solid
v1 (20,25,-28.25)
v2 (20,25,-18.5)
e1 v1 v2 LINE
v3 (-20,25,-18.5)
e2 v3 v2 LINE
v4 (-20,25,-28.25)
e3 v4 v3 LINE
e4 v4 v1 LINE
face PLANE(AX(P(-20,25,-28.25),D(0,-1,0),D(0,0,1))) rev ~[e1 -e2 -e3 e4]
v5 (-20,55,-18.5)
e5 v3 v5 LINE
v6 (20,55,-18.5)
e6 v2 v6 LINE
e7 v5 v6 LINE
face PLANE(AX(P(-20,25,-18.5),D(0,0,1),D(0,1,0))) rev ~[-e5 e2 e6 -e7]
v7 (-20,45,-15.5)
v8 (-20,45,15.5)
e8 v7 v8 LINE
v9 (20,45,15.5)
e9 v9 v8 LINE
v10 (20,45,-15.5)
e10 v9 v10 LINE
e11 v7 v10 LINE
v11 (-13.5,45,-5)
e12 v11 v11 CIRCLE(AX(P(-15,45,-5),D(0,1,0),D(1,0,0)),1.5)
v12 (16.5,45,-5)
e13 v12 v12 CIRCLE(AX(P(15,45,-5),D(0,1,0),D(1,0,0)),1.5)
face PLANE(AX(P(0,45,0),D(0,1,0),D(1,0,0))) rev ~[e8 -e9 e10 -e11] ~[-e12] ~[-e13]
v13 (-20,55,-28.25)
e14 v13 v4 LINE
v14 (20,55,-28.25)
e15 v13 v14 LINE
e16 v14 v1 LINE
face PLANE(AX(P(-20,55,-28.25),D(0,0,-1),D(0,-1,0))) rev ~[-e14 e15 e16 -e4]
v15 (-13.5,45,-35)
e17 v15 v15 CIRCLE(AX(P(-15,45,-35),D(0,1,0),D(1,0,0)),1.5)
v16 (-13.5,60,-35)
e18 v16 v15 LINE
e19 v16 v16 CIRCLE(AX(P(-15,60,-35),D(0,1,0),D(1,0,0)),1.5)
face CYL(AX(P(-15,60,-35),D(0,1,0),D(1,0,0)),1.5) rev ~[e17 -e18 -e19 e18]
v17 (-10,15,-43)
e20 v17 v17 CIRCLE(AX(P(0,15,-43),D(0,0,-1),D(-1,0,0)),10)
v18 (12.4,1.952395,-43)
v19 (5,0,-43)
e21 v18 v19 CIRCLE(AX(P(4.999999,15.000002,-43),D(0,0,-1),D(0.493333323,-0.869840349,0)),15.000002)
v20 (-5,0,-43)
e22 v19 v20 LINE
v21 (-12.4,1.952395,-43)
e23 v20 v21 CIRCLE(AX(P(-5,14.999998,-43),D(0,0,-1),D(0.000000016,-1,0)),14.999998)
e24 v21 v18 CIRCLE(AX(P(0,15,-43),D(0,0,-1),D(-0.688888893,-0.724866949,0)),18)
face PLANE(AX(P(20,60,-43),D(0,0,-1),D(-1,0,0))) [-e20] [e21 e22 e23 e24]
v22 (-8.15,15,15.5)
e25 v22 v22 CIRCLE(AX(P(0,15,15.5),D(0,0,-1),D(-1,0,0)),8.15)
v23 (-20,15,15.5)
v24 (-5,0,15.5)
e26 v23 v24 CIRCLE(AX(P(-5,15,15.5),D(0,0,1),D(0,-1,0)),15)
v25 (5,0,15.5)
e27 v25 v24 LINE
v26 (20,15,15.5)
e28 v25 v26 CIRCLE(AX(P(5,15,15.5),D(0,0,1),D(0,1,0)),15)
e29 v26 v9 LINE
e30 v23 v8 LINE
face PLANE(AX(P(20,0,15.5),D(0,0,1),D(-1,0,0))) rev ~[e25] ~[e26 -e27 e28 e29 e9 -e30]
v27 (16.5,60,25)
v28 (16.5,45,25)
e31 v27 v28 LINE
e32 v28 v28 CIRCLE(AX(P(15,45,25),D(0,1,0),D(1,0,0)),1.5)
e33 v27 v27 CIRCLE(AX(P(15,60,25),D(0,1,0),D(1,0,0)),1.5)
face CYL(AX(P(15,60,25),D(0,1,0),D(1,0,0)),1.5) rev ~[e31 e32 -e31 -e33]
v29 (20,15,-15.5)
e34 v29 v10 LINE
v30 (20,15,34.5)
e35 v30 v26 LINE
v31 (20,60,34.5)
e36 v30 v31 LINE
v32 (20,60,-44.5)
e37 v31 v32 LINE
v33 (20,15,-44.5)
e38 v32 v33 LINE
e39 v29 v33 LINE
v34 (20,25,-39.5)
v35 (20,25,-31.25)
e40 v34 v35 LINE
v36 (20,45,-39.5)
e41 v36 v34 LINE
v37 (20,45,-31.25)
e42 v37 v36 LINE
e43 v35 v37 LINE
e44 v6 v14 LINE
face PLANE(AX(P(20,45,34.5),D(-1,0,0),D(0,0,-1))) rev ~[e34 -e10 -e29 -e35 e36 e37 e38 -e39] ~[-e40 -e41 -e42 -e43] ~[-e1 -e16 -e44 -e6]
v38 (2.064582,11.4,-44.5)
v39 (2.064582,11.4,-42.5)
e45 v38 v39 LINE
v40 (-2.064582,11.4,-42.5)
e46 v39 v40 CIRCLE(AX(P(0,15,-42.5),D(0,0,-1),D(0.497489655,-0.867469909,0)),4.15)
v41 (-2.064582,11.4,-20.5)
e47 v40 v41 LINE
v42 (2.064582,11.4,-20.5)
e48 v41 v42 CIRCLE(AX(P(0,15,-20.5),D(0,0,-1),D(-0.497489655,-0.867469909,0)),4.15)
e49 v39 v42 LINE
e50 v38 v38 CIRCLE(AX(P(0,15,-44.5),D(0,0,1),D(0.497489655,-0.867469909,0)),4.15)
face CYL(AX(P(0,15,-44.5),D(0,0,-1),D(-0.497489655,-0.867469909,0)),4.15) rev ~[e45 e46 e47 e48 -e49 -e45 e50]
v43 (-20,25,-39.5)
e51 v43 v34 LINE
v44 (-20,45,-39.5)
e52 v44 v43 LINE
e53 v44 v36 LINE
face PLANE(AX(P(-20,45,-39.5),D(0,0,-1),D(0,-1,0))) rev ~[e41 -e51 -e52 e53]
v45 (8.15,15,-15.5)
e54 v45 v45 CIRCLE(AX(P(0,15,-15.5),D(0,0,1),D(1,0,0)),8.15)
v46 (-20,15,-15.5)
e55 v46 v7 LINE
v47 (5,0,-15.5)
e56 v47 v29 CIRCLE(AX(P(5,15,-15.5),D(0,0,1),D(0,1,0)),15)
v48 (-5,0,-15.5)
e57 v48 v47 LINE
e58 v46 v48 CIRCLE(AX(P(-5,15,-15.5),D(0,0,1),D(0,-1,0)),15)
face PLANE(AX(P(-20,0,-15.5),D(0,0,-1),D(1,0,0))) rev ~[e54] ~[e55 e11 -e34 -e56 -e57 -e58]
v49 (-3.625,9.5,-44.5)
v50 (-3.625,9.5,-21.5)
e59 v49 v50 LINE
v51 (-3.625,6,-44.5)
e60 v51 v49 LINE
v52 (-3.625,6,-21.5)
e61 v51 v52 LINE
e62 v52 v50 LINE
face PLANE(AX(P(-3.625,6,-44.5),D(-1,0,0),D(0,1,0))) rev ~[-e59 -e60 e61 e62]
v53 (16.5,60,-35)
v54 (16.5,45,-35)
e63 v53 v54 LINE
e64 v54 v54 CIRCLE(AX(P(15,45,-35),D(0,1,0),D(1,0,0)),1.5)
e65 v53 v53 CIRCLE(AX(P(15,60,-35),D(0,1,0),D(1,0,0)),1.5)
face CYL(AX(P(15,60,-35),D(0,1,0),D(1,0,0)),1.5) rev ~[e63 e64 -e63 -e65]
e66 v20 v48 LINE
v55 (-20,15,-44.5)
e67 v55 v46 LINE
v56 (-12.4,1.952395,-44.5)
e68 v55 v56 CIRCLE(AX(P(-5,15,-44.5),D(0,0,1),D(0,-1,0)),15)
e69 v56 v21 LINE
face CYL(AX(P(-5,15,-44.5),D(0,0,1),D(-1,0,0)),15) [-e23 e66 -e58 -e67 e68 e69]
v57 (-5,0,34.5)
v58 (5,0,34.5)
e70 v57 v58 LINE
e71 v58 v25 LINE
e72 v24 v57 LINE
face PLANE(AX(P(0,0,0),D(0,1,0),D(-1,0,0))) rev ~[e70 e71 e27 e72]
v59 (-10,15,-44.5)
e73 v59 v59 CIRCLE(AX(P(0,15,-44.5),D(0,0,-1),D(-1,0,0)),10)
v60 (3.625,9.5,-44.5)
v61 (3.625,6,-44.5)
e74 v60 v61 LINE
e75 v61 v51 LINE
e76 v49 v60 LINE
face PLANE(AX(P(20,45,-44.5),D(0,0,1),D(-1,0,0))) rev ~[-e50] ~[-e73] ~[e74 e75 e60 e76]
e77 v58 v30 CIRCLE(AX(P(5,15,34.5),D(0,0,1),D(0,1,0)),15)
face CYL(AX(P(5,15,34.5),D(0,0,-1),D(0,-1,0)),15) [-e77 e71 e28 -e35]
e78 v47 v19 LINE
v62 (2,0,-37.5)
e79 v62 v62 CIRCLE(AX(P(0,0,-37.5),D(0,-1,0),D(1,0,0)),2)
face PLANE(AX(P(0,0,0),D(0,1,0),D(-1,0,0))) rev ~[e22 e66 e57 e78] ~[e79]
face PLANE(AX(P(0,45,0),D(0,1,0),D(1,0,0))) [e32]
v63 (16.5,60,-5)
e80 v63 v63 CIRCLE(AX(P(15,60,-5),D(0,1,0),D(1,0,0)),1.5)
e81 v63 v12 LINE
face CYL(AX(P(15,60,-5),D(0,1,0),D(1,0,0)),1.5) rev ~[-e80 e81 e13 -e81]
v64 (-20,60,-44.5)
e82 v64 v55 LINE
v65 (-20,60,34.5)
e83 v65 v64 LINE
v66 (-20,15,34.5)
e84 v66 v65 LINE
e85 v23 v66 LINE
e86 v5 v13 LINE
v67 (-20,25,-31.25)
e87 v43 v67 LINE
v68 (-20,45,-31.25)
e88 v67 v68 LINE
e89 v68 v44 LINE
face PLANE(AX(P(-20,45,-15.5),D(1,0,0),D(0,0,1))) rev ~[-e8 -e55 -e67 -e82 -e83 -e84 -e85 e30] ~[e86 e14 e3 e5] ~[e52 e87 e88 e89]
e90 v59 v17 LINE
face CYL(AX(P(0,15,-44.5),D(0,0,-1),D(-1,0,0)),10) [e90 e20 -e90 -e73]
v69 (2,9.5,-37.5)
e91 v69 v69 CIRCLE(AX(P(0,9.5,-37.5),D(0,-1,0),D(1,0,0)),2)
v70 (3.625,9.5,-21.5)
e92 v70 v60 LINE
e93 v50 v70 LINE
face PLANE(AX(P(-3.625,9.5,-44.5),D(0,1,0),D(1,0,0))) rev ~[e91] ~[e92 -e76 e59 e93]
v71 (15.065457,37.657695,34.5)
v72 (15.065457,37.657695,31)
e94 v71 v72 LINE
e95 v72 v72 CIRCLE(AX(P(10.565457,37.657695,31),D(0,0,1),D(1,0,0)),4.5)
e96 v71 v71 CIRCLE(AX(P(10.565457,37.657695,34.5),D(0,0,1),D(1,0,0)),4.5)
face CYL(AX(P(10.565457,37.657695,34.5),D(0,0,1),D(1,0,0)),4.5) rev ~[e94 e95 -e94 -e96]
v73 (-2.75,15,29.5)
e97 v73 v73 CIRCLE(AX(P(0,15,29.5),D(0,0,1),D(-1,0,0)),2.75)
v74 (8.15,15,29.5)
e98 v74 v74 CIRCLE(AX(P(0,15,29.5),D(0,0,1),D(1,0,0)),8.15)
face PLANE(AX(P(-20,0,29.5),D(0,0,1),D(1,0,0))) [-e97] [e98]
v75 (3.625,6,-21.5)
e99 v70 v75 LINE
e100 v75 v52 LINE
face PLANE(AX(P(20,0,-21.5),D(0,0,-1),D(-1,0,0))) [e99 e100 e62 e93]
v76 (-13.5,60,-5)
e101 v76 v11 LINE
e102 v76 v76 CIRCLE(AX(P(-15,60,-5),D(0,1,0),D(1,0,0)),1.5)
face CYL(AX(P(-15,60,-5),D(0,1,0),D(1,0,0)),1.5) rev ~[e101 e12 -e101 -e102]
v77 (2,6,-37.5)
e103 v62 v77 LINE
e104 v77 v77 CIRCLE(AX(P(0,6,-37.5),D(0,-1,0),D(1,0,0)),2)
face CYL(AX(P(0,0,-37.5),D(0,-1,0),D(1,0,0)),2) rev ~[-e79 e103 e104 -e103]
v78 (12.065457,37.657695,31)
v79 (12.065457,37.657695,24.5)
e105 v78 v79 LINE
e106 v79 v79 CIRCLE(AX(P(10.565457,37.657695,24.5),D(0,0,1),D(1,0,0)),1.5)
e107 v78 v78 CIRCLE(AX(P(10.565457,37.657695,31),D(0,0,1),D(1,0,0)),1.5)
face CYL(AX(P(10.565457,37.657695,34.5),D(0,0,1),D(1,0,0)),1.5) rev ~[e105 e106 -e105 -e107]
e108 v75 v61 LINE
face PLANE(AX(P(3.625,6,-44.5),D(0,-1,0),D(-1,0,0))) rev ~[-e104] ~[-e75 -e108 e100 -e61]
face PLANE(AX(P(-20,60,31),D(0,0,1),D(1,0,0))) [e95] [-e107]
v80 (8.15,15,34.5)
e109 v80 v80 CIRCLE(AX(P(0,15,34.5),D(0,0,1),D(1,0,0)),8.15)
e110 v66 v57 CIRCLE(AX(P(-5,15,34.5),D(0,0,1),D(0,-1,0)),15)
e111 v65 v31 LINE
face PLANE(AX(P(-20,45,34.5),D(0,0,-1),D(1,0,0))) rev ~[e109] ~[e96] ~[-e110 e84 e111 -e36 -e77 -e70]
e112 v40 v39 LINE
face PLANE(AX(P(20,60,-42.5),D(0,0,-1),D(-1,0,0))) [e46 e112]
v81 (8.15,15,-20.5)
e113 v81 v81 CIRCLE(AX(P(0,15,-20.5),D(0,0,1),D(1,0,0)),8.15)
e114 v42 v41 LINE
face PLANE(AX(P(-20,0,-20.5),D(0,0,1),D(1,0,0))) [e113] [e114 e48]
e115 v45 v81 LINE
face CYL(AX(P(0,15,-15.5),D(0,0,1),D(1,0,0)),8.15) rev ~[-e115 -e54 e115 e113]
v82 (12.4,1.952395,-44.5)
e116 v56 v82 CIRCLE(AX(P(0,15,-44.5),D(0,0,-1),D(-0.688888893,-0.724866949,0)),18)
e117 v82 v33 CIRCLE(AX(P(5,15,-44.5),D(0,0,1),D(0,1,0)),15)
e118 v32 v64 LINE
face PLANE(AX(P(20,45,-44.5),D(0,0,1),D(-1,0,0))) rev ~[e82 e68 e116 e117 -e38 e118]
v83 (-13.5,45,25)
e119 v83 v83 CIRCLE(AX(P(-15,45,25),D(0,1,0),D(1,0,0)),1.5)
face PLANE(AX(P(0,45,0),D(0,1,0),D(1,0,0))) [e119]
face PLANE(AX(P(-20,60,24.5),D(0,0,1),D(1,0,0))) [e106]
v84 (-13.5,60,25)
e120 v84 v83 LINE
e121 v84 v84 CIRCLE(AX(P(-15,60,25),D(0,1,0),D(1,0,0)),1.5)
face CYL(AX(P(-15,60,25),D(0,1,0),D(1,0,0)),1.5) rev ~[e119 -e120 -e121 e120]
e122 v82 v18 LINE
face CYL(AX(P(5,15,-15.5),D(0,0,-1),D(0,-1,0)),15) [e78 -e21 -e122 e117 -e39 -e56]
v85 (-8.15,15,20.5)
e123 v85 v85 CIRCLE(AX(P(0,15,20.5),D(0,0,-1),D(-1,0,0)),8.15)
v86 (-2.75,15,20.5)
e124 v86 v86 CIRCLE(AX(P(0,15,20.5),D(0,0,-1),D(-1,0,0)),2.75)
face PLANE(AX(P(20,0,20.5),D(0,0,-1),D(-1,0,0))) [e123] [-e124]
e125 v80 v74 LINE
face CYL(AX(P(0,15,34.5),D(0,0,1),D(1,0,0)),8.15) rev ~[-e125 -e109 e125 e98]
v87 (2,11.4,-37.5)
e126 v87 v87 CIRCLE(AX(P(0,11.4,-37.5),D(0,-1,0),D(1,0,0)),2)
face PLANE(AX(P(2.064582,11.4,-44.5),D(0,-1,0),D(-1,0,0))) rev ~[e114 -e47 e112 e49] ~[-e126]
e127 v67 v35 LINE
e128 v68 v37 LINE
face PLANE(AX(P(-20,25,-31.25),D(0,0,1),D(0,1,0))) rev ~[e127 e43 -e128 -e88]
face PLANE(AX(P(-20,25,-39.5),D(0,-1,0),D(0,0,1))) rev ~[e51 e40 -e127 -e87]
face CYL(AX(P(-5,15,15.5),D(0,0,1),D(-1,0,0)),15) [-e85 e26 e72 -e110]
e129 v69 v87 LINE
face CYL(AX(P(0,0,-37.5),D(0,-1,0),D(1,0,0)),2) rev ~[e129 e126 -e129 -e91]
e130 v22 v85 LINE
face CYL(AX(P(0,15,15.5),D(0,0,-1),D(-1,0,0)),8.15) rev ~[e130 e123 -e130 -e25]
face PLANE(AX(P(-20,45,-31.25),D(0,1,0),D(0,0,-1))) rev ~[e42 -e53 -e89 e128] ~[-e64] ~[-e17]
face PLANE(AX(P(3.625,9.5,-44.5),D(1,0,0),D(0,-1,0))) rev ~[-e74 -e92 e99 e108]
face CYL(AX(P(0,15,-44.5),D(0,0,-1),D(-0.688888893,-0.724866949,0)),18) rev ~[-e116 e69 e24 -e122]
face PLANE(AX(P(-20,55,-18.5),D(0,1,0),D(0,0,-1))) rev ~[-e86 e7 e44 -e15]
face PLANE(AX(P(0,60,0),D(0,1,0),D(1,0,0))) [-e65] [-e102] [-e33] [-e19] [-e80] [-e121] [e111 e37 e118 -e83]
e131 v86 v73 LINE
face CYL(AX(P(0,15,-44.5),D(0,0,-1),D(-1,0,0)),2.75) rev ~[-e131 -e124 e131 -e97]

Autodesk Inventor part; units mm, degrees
ref_plane "YZ Plane" through (0, 0, 0) normal (1, 0, 0) x (0, 1, 0)
ref_plane "XZ Plane" through (0, 0, 0) normal (0, 1, 0) x (-1, 0, 0)
ref_plane "XY Plane" through (0, 0, 0) normal (0, 0, 1) x (1, 0, 0)
sketch "Sketch1" plane through (0, 0, 0) normal (0, 1, 0) x (-1, 0, 0)
  line L0 (20, 34.5) -> (-20, 34.5)
  line L1 (-20, 34.5) -> (-20, 15.5)
  line L2 (-20, 15.5) -> (20, 15.5)
  line L3 (20, 15.5) -> (20, 34.5)
  line L4 (20, -15.5) -> (-20, -15.5)
  line L5 (-20, -15.5) -> (-20, -44.5)
  line L6 (-20, -44.5) -> (20, -44.5)
  line L7 (20, -44.5) -> (20, -15.5)
  point P0 (0, 0)
  dimension "d0" = 31
  dimension "d1" = 19
  dimension "d2" = 40
  dimension "d3" = 20
  dimension "d4" = 29
  dimension "d50" = 15.5
sketch "Sketch1 outline for Extrusion1" plane through (0, 0, 0) normal (0, 1, 0) x (-1, 0, 0)
  line L0 (20, -15.5) -> (-20, -15.5)
  line L1 (20, -44.5) -> (20, -15.5)
  line L2 (-20, -44.5) -> (20, -44.5)
  line L3 (-20, -15.5) -> (-20, -44.5)
  line L4 (20, 34.5) -> (-20, 34.5)
  line L5 (20, 15.5) -> (20, 34.5)
  line L6 (-20, 15.5) -> (20, 15.5)
  line L7 (-20, 34.5) -> (-20, 15.5)
extrude "Extrusion1" add sketch "Sketch1 outline for Extrusion1" along normal blind 45
sketch "Sketch2" plane through (20, 0, -44.5) normal (0, 0, -1) x (-1, 0, 0)
  circle A0 centre (20, 15) radius 8.125
  line L0 (0, 0) -> (40, 0) projected
  circle A1 centre (20, 15) radius 2.75
  point P0 (20, 0)
  point P1 (20, 0)
  dimension "d7" = 16.25
  dimension "d8" = 15
  dimension "d9" = 5.5
sketch "Sketch2 outline for Extrusion2" plane through (20, 0, -44.5) normal (0, 0, -1) x (-1, 0, 0)
  circle A0 centre (20, 15) radius 2.75
extrude "Extrusion2" cut sketch "Sketch2 outline for Extrusion2" against normal blind 274.75
sketch "Sketch3" plane through (0, 45, 0) normal (0, 1, 0) x (1, 0, 0)
  line L0 (20, -34.5) -> (20, -15.5) projected
  line L1 (-20, 44.5) -> (-20, 15.5) projected
  line L2 (20, -34.5) -> (-20, -34.5)
  line L3 (-20, -34.5) -> (-20, 44.5)
  line L4 (-20, 44.5) -> (20, 44.5)
  line L5 (20, 44.5) -> (20, -34.5)
  point P0 (0, 0)
sketch "Sketch3 outline for Extrusion3" plane through (0, 45, 0) normal (0, 1, 0) x (1, 0, 0)
  line L0 (-20, -34.5) -> (20, -34.5)
  line L1 (-20, 15.5) -> (-20, -34.5)
  line L2 (-20, 44.5) -> (-20, 15.5)
  line L3 (20, 44.5) -> (-20, 44.5)
  line L4 (20, -15.5) -> (20, 44.5)
  line L5 (20, -34.5) -> (20, -15.5)
extrude "Extrusion3" add sketch "Sketch3 outline for Extrusion3" along normal blind 15
sketch "Sketch4" plane through (-20, 0, -44.5) normal (-1, 0, 0) x (0, 0, 1)
  line L0 (5, 55) -> (26, 55)
  line L1 (26, 55) -> (26, 25)
  line L2 (26, 25) -> (5, 25)
  line L3 (5, 25) -> (5, 55)
  line L4 (0, 0) -> (0, 60) projected
  line L5 (29, 0) -> (29, 45) projected
  line L6 (0, 60) -> (79, 60) projected
  line L7 (0, 0) -> (29, 0) projected
  line L8 (13.25, 55) -> (16.25, 55)
  line L9 (16.25, 55) -> (16.25, 25)
  line L10 (16.25, 25) -> (13.25, 25)
  line L11 (13.25, 25) -> (13.25, 55)
  line L12 (5, 55) -> (13.25, 55)
  line L13 (13.25, 45) -> (5, 45)
  point P0 (44.5, 0)
  dimension "d14" = 5
  dimension "d15" = 3
  dimension "d16" = 5
  dimension "d18" = 3
  dimension "d19" = 9.75
  dimension "d45" = 25
sketch "Sketch4 outline for Extrusion4" plane through (-20, 0, -44.5) normal (-1, 0, 0) x (0, 0, 1)
  line L0 (26, 25) -> (26, 55)
  line L1 (16.25, 25) -> (26, 25)
  line L2 (16.25, 55) -> (16.25, 25)
  line L3 (26, 55) -> (16.25, 55)
  line L4 (13.25, 45) -> (5, 45)
  line L5 (13.25, 25) -> (13.25, 45)
  line L6 (5, 25) -> (13.25, 25)
  line L7 (5, 45) -> (5, 25)
extrude "Extrusion4" cut sketch "Sketch4 outline for Extrusion4" against normal blind 100
sketch "Sketch5" plane through (20, 0, -44.5) normal (0, 0, -1) x (-1, 0, 0)
  circle A0 centre (20, 15) radius 2.75
  circle A1 centre (20, 15) radius 4.15
  line L0 (17.935418, 11.4) -> (22.064582, 11.4)
  point P0 (20, 0)
  dimension "d22" = 8.3
  dimension "d24" = 3.6
sketch "Sketch5 outline for Extrusion5" plane through (20, 0, -44.5) normal (0, 0, -1) x (-1, 0, 0)
  line L0 (17.935418, 11.4) -> (22.064582, 11.4)
  arc A0 (22.064582, 11.4) -> (17.935418, 11.4) centre (20, 15) ccw
  circle A1 centre (20, 15) radius 2.75
extrude "Extrusion5" cut sketch "Sketch5 outline for Extrusion5" against normal blind 25
sketch "Sketch6" plane through (20, 0, -44.5) normal (0, 0, -1) x (-1, 0, 0)
  line L0 (16.375, 9.5) -> (23.625, 9.5)
  line L1 (23.625, 9.5) -> (23.625, 6)
  line L2 (23.625, 6) -> (16.375, 6)
  line L3 (16.375, 6) -> (16.375, 9.5)
  line L4 (0, 0) -> (40, 0) projected
  circle A0 centre (20, 15) radius 2.75 projected
  point P0 (20, 0)
  point P1 (20, 0)
  dimension "d27" = 3.5
  dimension "d28" = 7.25
  dimension "d29" = 3.625
  dimension "d30" = 5.5
sketch "Sketch6 outline for Extrusion6" plane through (20, 0, -44.5) normal (0, 0, -1) x (-1, 0, 0)
  line L0 (16.375, 9.5) -> (16.375, 6)
  line L1 (23.625, 9.5) -> (16.375, 9.5)
  line L2 (23.625, 6) -> (23.625, 9.5)
  line L3 (16.375, 6) -> (23.625, 6)
extrude "Extrusion6" cut sketch "Sketch6 outline for Extrusion6" against normal blind 23
sketch "Sketch7" plane through (0, 0, 0) normal (0, -1, 0) x (1, 0, 0)
  circle A0 centre (0, -37.5) radius 2
  point P0 (0, 0)
  dimension "d33" = 4
  dimension "d34" = 37.5
sketch "Sketch7 outline for Extrusion7" plane through (0, 0, 0) normal (0, -1, 0) x (1, 0, 0)
  circle A0 centre (0, -37.5) radius 2
extrude "Extrusion7" cut sketch "Sketch7 outline for Extrusion7" against normal blind 15.5
sketch "Sketch8" plane through (-20, 0, -15.5) normal (0, 0, 1) x (1, 0, 0)
  circle A0 centre (20, 15) radius 2.75 projected
  circle A1 centre (20, 15) radius 8.15
  point P0 (20, 0)
  dimension "d37" = 16.3
sketch "Sketch8 outline for Extrusion8" plane through (-20, 0, -15.5) normal (0, 0, 1) x (1, 0, 0)
  circle A0 centre (20, 15) radius 8.15
  circle A1 centre (20, 15) radius 2.75
extrude "Extrusion8" cut sketch "Sketch8 outline for Extrusion8" against normal blind 5
sketch "Sketch9" plane through (-20, 0, 34.5) normal (0, 0, 1) x (1, 0, 0)
  circle A0 centre (20, 15) radius 2.75 projected
  circle A1 centre (20, 15) radius 8.15
  point P0 (20, 0)
sketch "Sketch9 outline for Extrusion9" plane through (-20, 0, 34.5) normal (0, 0, 1) x (1, 0, 0)
  circle A0 centre (20, 15) radius 8.15
  circle A1 centre (20, 15) radius 2.75
extrude "Extrusion9" cut sketch "Sketch9 outline for Extrusion9" against normal blind 5
sketch "Sketch10" plane through (20, 0, 15.5) normal (0, 0, -1) x (-1, 0, 0)
  circle A0 centre (20, 15) radius 2.75 projected
  circle A1 centre (20, 15) radius 8.15
  point P0 (20, 0)
sketch "Sketch10 outline for Extrusion10" plane through (20, 0, 15.5) normal (0, 0, -1) x (-1, 0, 0)
  circle A0 centre (20, 15) radius 8.15
  circle A1 centre (20, 15) radius 2.75
extrude "Extrusion10" cut sketch "Sketch10 outline for Extrusion10" against normal blind 5
fillet "Fillet1" radius 15 4 edges at (-20, 0, -30) (-20, 0, 25) (20, 0, 25) (20, 0, -30)
sketch "Sketch11" plane through (0, 60, 0) normal (0, 1, 0) x (1, 0, 0)
  line L0 (-15, -25) -> (15, -25)
  line L1 (15, -25) -> (15, 35)
  line L2 (15, 35) -> (-15, 35)
  line L3 (-15, 35) -> (-15, -25)
  circle A0 centre (-15, -25) radius 1.5
  circle A1 centre (-15, 35) radius 1.5
  circle A2 centre (15, 35) radius 1.5
  circle A3 centre (15, -25) radius 1.5
  circle A4 centre (-15, 5) radius 1.5
  circle A5 centre (15, 5) radius 1.5
  point P0 (0, 0)
  dimension "d46" = 60
  dimension "d47" = 30
  dimension "d48" = 15
  dimension "d49" = 25
  dimension "d51" = 3
  dimension "d52" = 3
  dimension "d53" = 3
  dimension "d54" = 3
  dimension "d55" = 3
  dimension "d56" = 3
sketch "Sketch11 outline for Extrusion11" plane through (0, 60, 0) normal (0, 1, 0) x (1, 0, 0)
  circle A0 centre (-15, 35) radius 1.5
  circle A1 centre (15, -25) radius 1.5
  circle A2 centre (15, 5) radius 1.5
  circle A3 centre (-15, -25) radius 1.5
  circle A4 centre (15, 35) radius 1.5
  circle A5 centre (-15, 5) radius 1.5
extrude "Extrusion11" cut sketch "Sketch11 outline for Extrusion11" against normal blind 15
sketch "Sketch12" plane through (20, 60, -44.5) normal (0, 0, -1) x (-1, 0, 0)
  arc A0 (22.064582, -48.6) -> (17.935418, -48.6) centre (20, -45) ccw
  circle A1 centre (20, -45) radius 4.15
  point P0 (20, -60)
  point P1 (17.935418, -48.6)
sketch "Sketch12 outline for Extrusion12" plane through (20, 60, -44.5) normal (0, 0, -1) x (-1, 0, 0)
  arc A0 (17.935418, -48.6) -> (22.064582, -48.6) centre (20, -45) ccw
  arc A1 (22.064582, -48.6) -> (17.935418, -48.6) centre (20, -45) ccw
extrude "Extrusion12" cut sketch "Sketch12 outline for Extrusion12" against normal blind 2
sketch "Sketch13" plane through (20, 60, -44.5) normal (0, 0, -1) x (-1, 0, 0)
  arc A0 (22.064582, -48.6) -> (17.935418, -48.6) centre (20, -45) ccw
  circle A1 centre (20, -45) radius 10
  line L0 (20, -35) -> (40, -35)
  line L1 (40, -35) -> (0, -35)
  line L2 (0, -45) -> (0, 0)
  circle A2 centre (20, -45) radius 4.15
  arc A3 (0, -45) -> (15, -60) centre (15, -45) ccw
  line L3 (15, -60) -> (25, -60)
  arc A4 (25, -60) -> (40, -45) centre (25, -45) ccw
  line L4 (40, -45) -> (40, 0)
  line L5 (0, 0) -> (40, 0)
  line L6 (0, -45) -> (0, 0)
  line L7 (23.625, -50.5) -> (23.625, -54)
  line L8 (23.625, -54) -> (16.375, -54)
  line L9 (16.375, -54) -> (16.375, -50.5)
  line L10 (16.375, -50.5) -> (23.625, -50.5)
  circle A5 centre (20, -45) radius 18
  point P0 (20, -60)
  point P1 (40, -35)
  point P2 (17.935418, -48.6)
  point P3 (7.6, -58.047605)
  point P4 (34.96663, -35)
  point P5 (32.4, -58.047605)
  dimension "d61" = 20
  dimension "d64" = 36
sketch "Sketch13 outline for Extrusion13" plane through (20, 60, -44.5) normal (0, 0, -1) x (-1, 0, 0)
  circle A0 centre (20, -45) radius 4.15
  line L0 (23.625, -50.5) -> (16.375, -50.5)
  line L1 (23.625, -54) -> (23.625, -50.5)
  line L2 (16.375, -54) -> (23.625, -54)
  line L3 (16.375, -50.5) -> (16.375, -54)
  arc A1 (32.4, -58.047605) -> (7.6, -58.047605) centre (20, -45) ccw
  arc A2 (25, -60) -> (32.4, -58.047605) centre (25, -45) ccw
  arc A3 (7.6, -58.047605) -> (15, -60) centre (15, -45) ccw
  line L4 (15, -60) -> (25, -60)
  circle A4 centre (20, -45) radius 10
extrude "Extrusion13" cut sketch "Sketch13 outline for Extrusion13" against normal blind 1.5
sketch "Sketch14" plane through (-20, 60, 34.5) normal (0, 0, 1) x (1, 0, 0)
  circle A0 centre (30.565457, -22.342305) radius 4.5
  circle A1 centre (20, -45) radius 2.75
  circle A2 centre (30.565457, -22.342305) radius 1.5
  line L0 (20, -45) -> (20, 2.624244)
  line L1 (20, 2.624244) -> (20, -45)
  line L2 (30.565457, -22.342305) -> (20, -45)
  point P0 (20, -60)
  dimension "d65" = 25
  dimension "d66" = 9
  dimension "d67" = 3
  dimension "d72" = 25
sketch "Sketch14 outline for Extrusion14" plane through (-20, 60, 34.5) normal (0, 0, 1) x (1, 0, 0)
  circle A0 centre (30.565457, -22.342305) radius 1.5
extrude "Extrusion14" cut sketch "Sketch14 outline for Extrusion14" against normal blind 10
sketch "Sketch14 outline for Extrusion15" plane through (-20, 60, 34.5) normal (0, 0, 1) x (1, 0, 0)
  circle A0 centre (30.565457, -22.342305) radius 4.5
  circle A1 centre (30.565457, -22.342305) radius 1.5
extrude "Extrusion15" cut sketch "Sketch14 outline for Extrusion15" against normal blind 3.5
properties part number "Gimbal_1"
